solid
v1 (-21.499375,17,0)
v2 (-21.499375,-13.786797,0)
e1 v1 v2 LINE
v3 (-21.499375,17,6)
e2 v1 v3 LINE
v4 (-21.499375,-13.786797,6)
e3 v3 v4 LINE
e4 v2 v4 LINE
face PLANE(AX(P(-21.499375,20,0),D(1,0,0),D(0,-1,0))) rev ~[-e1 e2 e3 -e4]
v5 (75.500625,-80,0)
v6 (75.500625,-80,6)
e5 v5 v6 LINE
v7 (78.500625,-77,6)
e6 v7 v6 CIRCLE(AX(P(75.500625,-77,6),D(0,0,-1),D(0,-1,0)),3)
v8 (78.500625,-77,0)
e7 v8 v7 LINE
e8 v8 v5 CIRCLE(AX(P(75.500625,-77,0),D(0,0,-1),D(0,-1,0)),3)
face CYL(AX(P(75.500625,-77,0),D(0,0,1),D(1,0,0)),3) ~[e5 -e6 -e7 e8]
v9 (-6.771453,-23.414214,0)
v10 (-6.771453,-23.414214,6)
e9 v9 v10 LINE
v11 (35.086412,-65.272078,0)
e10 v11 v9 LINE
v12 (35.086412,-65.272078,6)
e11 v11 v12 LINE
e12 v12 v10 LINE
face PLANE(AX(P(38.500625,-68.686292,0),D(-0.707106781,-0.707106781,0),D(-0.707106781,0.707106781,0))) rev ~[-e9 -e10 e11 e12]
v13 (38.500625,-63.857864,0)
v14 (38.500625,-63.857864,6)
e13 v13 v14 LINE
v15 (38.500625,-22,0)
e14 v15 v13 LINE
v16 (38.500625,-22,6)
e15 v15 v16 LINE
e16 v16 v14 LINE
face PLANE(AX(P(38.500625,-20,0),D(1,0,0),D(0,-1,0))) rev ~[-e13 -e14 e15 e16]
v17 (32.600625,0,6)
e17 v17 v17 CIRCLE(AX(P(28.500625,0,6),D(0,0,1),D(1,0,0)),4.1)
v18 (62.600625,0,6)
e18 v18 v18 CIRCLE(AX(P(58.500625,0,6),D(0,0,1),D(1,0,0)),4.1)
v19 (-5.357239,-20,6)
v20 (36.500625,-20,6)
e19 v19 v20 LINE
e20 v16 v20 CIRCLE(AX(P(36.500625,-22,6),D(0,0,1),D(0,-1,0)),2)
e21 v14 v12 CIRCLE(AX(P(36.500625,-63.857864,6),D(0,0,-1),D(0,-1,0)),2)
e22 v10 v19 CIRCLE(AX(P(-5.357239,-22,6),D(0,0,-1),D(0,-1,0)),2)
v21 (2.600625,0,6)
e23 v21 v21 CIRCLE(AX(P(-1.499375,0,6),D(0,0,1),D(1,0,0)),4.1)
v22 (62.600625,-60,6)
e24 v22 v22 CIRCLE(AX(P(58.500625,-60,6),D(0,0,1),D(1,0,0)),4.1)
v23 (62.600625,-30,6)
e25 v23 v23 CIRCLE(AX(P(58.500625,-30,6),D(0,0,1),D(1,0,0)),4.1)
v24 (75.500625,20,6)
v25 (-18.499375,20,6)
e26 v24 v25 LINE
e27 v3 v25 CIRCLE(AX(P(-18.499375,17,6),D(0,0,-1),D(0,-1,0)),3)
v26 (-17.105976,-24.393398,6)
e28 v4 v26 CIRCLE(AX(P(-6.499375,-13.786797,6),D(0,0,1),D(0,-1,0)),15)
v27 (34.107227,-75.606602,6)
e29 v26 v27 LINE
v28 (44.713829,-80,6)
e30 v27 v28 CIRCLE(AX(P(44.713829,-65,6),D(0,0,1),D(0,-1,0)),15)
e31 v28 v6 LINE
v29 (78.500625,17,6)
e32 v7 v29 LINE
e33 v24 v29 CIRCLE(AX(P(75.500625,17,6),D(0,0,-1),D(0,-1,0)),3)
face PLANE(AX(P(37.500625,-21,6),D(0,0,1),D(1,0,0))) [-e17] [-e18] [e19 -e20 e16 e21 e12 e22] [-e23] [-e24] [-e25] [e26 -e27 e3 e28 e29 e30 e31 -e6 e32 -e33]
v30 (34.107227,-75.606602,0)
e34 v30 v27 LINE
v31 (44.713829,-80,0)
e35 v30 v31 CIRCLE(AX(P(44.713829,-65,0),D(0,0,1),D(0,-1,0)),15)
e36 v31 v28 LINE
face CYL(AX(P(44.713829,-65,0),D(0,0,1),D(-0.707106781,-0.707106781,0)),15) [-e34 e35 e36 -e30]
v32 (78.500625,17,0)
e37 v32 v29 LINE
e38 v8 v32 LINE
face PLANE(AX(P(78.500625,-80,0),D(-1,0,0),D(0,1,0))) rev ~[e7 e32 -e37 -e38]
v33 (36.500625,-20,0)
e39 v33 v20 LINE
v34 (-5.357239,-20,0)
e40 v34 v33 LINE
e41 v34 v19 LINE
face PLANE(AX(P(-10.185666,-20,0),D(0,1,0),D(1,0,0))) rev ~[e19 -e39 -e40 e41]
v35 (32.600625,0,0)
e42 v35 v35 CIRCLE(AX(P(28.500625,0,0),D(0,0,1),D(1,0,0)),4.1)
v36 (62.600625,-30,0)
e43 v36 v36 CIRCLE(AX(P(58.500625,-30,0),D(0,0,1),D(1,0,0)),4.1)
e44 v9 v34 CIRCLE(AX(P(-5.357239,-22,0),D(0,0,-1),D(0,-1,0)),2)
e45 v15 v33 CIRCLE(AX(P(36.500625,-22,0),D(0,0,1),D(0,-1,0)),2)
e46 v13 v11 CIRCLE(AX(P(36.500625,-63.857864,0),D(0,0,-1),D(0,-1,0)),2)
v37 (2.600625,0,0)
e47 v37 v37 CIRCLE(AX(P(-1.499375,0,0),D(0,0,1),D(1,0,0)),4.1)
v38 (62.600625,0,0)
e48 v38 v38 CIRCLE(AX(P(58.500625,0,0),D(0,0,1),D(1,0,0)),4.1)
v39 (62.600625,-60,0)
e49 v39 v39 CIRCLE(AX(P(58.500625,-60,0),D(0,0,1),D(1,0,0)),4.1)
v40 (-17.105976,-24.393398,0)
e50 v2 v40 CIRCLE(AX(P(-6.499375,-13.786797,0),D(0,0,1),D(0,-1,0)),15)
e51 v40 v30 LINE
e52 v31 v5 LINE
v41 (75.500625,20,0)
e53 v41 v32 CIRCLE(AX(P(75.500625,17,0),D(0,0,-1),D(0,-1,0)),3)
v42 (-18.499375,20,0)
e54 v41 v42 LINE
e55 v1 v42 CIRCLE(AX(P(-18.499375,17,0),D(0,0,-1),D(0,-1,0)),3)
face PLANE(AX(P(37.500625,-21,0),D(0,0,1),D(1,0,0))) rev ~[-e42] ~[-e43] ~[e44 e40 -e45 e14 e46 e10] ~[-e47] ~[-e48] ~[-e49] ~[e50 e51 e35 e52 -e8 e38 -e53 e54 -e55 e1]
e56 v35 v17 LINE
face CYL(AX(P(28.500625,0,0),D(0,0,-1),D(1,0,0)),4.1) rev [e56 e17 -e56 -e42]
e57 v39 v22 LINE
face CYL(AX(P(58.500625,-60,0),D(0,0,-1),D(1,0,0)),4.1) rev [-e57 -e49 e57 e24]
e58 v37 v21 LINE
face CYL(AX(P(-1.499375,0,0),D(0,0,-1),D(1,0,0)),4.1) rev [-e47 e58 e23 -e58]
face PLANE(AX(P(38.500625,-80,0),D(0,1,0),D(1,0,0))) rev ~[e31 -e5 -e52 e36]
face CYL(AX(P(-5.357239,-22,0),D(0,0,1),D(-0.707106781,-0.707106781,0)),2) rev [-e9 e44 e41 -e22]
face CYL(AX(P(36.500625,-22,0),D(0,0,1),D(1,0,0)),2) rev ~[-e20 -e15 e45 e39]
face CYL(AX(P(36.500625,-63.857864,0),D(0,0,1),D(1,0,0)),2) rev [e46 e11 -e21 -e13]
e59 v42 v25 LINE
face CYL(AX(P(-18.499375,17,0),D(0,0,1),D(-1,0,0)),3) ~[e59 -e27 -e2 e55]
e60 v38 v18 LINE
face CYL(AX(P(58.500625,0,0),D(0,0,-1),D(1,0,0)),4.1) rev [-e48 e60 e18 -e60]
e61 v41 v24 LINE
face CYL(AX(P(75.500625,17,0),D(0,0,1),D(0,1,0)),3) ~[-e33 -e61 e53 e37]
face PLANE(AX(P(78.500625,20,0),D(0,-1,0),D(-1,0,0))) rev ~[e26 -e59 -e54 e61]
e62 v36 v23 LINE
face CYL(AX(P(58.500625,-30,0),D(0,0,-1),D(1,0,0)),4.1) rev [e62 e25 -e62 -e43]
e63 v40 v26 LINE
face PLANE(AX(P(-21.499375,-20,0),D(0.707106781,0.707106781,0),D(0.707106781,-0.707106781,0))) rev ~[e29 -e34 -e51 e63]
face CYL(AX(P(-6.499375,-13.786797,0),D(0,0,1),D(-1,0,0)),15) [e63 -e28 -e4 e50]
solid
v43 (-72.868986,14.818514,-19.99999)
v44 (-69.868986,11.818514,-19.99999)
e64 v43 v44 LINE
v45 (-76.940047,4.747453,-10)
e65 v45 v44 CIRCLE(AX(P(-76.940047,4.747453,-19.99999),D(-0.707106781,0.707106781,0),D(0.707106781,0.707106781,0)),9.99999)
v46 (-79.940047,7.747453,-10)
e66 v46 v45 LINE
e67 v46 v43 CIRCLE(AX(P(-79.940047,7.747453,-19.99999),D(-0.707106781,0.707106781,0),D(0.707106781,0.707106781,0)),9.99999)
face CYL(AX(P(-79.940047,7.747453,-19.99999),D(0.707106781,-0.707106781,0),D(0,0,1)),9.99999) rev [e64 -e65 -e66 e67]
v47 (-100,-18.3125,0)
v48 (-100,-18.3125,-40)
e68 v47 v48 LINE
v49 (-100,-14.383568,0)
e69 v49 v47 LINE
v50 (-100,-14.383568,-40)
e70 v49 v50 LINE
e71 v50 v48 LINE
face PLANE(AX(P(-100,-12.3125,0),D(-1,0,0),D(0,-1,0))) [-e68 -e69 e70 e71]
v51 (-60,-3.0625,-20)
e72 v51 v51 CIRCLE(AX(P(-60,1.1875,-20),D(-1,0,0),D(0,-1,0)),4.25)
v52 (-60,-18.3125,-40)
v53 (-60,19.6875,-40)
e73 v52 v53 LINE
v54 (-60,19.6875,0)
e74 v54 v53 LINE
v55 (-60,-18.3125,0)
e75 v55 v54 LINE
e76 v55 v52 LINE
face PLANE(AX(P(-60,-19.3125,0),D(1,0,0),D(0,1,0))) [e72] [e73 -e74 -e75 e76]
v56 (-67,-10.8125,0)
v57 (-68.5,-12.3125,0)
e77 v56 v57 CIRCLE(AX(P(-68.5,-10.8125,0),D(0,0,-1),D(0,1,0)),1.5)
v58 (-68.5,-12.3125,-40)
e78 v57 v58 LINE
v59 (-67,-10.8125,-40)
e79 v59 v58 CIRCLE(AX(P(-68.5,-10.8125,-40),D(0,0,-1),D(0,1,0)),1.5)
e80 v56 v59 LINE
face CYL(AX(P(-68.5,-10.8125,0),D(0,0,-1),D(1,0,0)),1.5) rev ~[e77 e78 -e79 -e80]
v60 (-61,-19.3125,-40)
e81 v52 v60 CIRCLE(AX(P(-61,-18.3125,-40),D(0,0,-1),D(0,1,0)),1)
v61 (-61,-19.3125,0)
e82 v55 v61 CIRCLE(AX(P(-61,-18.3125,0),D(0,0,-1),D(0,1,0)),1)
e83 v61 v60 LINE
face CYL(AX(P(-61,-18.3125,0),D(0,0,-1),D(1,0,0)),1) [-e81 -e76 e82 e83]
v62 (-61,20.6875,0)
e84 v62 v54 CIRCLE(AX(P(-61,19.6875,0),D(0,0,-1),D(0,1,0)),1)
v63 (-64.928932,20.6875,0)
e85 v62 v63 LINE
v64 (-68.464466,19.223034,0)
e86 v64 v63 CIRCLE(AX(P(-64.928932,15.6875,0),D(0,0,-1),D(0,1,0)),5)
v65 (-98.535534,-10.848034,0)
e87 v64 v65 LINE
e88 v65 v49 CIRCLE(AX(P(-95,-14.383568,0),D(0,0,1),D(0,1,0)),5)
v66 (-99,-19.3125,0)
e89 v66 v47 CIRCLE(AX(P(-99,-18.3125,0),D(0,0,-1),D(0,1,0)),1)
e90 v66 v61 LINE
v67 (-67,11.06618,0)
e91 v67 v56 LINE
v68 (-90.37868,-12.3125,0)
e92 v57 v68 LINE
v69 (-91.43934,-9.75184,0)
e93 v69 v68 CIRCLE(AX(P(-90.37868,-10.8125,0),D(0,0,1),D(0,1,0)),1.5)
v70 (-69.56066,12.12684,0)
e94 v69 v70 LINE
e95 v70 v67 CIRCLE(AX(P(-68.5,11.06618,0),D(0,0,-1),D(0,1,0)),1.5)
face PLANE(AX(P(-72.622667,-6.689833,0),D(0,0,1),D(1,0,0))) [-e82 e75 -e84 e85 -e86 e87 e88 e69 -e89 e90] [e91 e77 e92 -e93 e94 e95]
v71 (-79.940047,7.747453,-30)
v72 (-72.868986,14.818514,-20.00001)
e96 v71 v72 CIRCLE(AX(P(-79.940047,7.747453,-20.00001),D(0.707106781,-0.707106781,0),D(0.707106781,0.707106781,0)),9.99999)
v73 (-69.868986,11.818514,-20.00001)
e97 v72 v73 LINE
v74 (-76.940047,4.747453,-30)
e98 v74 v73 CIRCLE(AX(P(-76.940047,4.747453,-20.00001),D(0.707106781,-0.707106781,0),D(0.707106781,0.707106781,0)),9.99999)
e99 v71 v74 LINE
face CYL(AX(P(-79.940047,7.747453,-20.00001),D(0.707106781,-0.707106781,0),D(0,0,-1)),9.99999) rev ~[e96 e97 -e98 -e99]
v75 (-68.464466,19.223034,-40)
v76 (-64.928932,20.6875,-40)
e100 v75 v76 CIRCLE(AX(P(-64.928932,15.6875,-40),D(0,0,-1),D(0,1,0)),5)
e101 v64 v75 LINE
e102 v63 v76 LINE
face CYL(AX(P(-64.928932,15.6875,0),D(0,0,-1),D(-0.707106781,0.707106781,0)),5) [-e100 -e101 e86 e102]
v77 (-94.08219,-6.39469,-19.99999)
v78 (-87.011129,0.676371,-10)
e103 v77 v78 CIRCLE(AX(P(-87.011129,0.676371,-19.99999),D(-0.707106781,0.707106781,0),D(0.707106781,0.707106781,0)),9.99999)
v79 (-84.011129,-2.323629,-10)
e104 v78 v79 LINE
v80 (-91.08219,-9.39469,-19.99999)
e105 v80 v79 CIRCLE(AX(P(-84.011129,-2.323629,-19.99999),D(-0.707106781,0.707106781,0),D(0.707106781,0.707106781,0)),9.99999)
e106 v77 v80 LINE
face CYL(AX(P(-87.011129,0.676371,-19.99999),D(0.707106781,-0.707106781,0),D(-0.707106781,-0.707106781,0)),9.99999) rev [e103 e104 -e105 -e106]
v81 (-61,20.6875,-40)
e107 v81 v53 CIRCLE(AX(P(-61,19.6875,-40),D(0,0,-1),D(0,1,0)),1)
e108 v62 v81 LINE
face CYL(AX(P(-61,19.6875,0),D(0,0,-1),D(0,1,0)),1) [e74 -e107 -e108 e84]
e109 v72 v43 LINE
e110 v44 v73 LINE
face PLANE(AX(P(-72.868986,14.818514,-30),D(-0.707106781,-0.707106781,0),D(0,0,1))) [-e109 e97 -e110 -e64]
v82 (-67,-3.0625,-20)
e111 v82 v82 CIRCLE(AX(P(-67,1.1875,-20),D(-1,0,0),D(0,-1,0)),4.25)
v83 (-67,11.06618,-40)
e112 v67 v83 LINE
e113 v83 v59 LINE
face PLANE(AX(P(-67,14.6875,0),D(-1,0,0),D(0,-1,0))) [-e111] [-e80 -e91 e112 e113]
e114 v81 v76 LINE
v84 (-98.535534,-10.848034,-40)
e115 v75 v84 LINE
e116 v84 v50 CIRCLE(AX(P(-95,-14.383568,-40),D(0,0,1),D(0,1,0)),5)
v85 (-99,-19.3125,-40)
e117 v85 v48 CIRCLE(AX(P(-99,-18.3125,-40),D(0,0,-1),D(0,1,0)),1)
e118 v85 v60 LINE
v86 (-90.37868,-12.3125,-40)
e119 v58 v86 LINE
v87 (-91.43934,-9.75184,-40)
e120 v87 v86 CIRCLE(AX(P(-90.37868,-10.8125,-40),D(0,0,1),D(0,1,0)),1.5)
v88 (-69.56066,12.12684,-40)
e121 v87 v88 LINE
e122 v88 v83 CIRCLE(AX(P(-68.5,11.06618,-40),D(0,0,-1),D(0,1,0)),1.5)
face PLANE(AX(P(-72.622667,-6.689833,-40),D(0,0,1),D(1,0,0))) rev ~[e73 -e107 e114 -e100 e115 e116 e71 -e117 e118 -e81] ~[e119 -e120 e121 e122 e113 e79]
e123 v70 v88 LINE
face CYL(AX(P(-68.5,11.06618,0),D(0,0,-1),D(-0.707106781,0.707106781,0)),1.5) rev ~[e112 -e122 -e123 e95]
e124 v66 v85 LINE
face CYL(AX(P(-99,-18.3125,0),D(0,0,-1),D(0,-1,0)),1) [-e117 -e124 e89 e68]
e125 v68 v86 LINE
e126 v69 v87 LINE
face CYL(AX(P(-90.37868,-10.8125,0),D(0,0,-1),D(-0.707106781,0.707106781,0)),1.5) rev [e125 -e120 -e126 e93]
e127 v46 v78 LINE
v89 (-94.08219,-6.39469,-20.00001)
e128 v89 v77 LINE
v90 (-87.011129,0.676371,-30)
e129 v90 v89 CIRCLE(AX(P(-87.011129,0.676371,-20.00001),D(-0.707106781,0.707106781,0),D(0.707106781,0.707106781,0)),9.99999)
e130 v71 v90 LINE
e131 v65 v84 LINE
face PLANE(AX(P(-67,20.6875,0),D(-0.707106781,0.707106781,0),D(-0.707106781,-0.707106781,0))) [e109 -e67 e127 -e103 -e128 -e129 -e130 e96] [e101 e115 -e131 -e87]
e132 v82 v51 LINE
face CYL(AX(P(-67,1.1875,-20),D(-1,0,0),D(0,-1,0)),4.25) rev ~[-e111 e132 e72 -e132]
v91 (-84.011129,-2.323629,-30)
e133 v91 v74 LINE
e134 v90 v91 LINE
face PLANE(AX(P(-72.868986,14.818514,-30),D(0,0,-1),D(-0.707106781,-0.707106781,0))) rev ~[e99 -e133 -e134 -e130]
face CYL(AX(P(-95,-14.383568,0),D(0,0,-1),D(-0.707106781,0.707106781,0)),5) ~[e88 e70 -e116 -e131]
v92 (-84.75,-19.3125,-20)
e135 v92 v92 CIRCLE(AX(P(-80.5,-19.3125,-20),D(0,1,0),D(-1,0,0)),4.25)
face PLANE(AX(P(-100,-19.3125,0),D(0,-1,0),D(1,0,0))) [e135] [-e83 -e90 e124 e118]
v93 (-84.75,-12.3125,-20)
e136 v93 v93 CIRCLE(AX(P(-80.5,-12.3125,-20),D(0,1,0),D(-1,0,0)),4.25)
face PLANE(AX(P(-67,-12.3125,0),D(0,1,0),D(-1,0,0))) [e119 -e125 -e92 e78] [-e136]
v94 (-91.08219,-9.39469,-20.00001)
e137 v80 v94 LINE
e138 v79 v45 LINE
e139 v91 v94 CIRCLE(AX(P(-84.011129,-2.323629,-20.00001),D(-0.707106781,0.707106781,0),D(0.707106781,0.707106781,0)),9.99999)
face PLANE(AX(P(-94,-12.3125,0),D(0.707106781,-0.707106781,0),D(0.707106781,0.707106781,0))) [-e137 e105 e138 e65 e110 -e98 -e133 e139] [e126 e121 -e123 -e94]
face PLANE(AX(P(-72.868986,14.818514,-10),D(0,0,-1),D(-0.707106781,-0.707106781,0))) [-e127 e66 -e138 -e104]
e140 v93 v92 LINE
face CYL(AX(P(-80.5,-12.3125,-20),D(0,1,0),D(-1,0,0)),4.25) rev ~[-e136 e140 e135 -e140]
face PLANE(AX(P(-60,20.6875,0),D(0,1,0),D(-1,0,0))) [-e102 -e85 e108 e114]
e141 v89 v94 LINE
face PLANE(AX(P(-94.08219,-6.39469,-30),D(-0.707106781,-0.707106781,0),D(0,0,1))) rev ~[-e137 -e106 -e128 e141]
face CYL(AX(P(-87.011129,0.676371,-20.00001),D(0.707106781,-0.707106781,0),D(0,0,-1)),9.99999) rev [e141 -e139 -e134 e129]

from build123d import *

# Parameters (mm, degrees)
F0_R           = 4.1
F1_DEPTH       = 6
F2_DEPTH       = 40
F5_D           = 8.5
F5_DEPTH       = 28
F5_TIP         = 2.5536576309
F5_ON_F3_D     = 8.5
F5_ON_F3_DEPTH = 28
F5_ON_F3_TIP   = 2.5536576309
F6_W           = 30
F6_H           = 20
F7_DEPTH       = 5
F8_R           = 9.99999
F9_R           = 5
F10_R          = 1.5
F11_R          = 1
F12_R          = 15
F13_R          = 2
F14_R          = 3


# Not quite as in the source:
# - a fillet or chamfer is up to 0.001 mm smaller than in the source, because OpenCascade refuses the exact size


with BuildPart() as f1:
    # F0 (on Top) → F1 (new body)
    with BuildSketch(Plane.XY):
        Polygon((78.5006253216, -80), (78.5006253216, 20), (-21.4993746784, 20), (-21.4993746784, -20), (-10.1856661794, -20), (38.5006253216, -20), (38.5006253216, -68.686291501), (38.5006253216, -80), align=None)
        with Locations((58.5006253216, -60)):
            Circle(F0_R, mode=Mode.SUBTRACT)
        with Locations((58.5006253216, -30)):
            Circle(F0_R, mode=Mode.SUBTRACT)
        with Locations((-1.4993746784, 0)):
            Circle(F0_R, mode=Mode.SUBTRACT)
        with Locations((28.5006253216, 0)):
            Circle(F0_R, mode=Mode.SUBTRACT)
        with Locations((58.5006253216, 0)):
            Circle(F0_R, mode=Mode.SUBTRACT)
        Polygon((-10.1856661794, -20), (-21.4993746784, -20), (38.5006253216, -80), (38.5006253216, -68.686291501), align=None)
    extrude(amount=F1_DEPTH)

    # F12
    f12_edges = [f1.edges().sort_by_distance(p)[0] for p in [
        (38.500625, -80, 3),
        (-21.499375, -20, 3),
    ]]
    fillet(f12_edges, radius=F12_R)

    # F13
    f13_edges = [f1.edges().sort_by_distance(p)[0] for p in [
        (38.500625, -20, 3),
        (-10.185666, -20, 3),
        (38.500625, -68.686292, 3),
    ]]
    fillet(f13_edges, radius=F13_R)

    # F14
    f14_edges = [f1.edges().sort_by_distance(p)[0] for p in [
        (-21.499375, 20, 3),
        (78.500625, 20, 3),
        (78.500625, -80, 3),
    ]]
    fillet(f14_edges, radius=F14_R)


with BuildPart() as f2:
    # F0 (on Top) → F2 (new body)
    with BuildSketch(Plane.XY):
        Polygon((-100, -19.3125), (-60, -19.3125), (-60, 20.6875), (-61, 20.6875), (-67, 14.6875), (-67, -12.3125), (-94, -12.3125), (-100, -18.3125), align=None)
        Polygon((-100, -12.3125), (-100, -18.3125), (-94, -12.3125), align=None)
        Polygon((-67, 20.6875), (-100, -12.3125), (-94, -12.3125), (-67, 14.6875), align=None)
        Polygon((-67, 14.6875), (-61, 20.6875), (-67, 20.6875), align=None)
    extrude(amount=-F2_DEPTH)

    # F5 (one way)
    with BuildSketch(Plane(origin=(-67, 0, 0), x_dir=(0, -1, 0), z_dir=(-1, 0, 0))):
        with Locations((-1.1875, -20)):
            Circle(F5_D / 2)
    extrude(amount=-F5_DEPTH, mode=Mode.SUBTRACT)
    with Locations(Plane(origin=(-67, 0, 0), x_dir=(0, -1, 0), z_dir=(-1, 0, 0))):
        with Locations((-1.1875, -20)):
            with Locations((0, 0, -(F5_DEPTH + F5_TIP / 2))):  # 118° drill point
                Cone(0, F5_D / 2, F5_TIP, mode=Mode.SUBTRACT)

    # F5 on F3 (one way)
    with BuildSketch(Plane(origin=(0, -12.3125, 0), x_dir=(-1, 0, 0), z_dir=(0, 1, 0))):
        with Locations((80.5, -20)):
            Circle(F5_ON_F3_D / 2)
    extrude(amount=-F5_ON_F3_DEPTH, mode=Mode.SUBTRACT)
    with Locations(Plane(origin=(0, -12.3125, 0), x_dir=(-1, 0, 0), z_dir=(0, 1, 0))):
        with Locations((80.5, -20)):
            with Locations((0, 0, -(F5_ON_F3_DEPTH + F5_ON_F3_TIP / 2))):  # 118° drill point
                Cone(0, F5_ON_F3_D / 2, F5_ON_F3_TIP, mode=Mode.SUBTRACT)

    # F6 (on face) → F7 (cut)
    with BuildSketch(Plane(origin=(-43.84375, 43.84375, 0), x_dir=(-0.7071067812, -0.7071067812, 0), z_dir=(-0.7071067812, 0.7071067812, 0))):
        with Locations((56.0478828037, -20)):
            Rectangle(F6_W, F6_H)
    extrude(amount=-F7_DEPTH, mode=Mode.SUBTRACT)

    # F8 (radius 10 in the source; OpenCascade refuses exactly that, so slightly less here)
    f8_edges = [f2.edges().sort_by_distance(p)[0] for p in [
        (-92.58219, -7.89469, -10),
        (-92.58219, -7.89469, -30),
        (-71.368986, 13.318514, -30),
        (-71.368986, 13.318514, -10),
    ]]
    fillet(f8_edges, radius=F8_R)

    # F9
    f9_edges = [f2.edges().sort_by_distance(p)[0] for p in [
        (-67, 20.6875, -20),
        (-100, -12.3125, -20),
    ]]
    fillet(f9_edges, radius=F9_R)

    # F10
    f10_edges = [f2.edges().sort_by_distance(p)[0] for p in [
        (-67, 14.6875, -20),
        (-67, -12.3125, -20),
        (-94, -12.3125, -20),
    ]]
    fillet(f10_edges, radius=F10_R)

    # F11
    f11_edges = [f2.edges().sort_by_distance(p)[0] for p in [
        (-60, 20.6875, -20),
        (-100, -19.3125, -20),
        (-60, -19.3125, -20),
    ]]
    fillet(f11_edges, radius=F11_R)


solid = Compound([f1.part, f2.part])
